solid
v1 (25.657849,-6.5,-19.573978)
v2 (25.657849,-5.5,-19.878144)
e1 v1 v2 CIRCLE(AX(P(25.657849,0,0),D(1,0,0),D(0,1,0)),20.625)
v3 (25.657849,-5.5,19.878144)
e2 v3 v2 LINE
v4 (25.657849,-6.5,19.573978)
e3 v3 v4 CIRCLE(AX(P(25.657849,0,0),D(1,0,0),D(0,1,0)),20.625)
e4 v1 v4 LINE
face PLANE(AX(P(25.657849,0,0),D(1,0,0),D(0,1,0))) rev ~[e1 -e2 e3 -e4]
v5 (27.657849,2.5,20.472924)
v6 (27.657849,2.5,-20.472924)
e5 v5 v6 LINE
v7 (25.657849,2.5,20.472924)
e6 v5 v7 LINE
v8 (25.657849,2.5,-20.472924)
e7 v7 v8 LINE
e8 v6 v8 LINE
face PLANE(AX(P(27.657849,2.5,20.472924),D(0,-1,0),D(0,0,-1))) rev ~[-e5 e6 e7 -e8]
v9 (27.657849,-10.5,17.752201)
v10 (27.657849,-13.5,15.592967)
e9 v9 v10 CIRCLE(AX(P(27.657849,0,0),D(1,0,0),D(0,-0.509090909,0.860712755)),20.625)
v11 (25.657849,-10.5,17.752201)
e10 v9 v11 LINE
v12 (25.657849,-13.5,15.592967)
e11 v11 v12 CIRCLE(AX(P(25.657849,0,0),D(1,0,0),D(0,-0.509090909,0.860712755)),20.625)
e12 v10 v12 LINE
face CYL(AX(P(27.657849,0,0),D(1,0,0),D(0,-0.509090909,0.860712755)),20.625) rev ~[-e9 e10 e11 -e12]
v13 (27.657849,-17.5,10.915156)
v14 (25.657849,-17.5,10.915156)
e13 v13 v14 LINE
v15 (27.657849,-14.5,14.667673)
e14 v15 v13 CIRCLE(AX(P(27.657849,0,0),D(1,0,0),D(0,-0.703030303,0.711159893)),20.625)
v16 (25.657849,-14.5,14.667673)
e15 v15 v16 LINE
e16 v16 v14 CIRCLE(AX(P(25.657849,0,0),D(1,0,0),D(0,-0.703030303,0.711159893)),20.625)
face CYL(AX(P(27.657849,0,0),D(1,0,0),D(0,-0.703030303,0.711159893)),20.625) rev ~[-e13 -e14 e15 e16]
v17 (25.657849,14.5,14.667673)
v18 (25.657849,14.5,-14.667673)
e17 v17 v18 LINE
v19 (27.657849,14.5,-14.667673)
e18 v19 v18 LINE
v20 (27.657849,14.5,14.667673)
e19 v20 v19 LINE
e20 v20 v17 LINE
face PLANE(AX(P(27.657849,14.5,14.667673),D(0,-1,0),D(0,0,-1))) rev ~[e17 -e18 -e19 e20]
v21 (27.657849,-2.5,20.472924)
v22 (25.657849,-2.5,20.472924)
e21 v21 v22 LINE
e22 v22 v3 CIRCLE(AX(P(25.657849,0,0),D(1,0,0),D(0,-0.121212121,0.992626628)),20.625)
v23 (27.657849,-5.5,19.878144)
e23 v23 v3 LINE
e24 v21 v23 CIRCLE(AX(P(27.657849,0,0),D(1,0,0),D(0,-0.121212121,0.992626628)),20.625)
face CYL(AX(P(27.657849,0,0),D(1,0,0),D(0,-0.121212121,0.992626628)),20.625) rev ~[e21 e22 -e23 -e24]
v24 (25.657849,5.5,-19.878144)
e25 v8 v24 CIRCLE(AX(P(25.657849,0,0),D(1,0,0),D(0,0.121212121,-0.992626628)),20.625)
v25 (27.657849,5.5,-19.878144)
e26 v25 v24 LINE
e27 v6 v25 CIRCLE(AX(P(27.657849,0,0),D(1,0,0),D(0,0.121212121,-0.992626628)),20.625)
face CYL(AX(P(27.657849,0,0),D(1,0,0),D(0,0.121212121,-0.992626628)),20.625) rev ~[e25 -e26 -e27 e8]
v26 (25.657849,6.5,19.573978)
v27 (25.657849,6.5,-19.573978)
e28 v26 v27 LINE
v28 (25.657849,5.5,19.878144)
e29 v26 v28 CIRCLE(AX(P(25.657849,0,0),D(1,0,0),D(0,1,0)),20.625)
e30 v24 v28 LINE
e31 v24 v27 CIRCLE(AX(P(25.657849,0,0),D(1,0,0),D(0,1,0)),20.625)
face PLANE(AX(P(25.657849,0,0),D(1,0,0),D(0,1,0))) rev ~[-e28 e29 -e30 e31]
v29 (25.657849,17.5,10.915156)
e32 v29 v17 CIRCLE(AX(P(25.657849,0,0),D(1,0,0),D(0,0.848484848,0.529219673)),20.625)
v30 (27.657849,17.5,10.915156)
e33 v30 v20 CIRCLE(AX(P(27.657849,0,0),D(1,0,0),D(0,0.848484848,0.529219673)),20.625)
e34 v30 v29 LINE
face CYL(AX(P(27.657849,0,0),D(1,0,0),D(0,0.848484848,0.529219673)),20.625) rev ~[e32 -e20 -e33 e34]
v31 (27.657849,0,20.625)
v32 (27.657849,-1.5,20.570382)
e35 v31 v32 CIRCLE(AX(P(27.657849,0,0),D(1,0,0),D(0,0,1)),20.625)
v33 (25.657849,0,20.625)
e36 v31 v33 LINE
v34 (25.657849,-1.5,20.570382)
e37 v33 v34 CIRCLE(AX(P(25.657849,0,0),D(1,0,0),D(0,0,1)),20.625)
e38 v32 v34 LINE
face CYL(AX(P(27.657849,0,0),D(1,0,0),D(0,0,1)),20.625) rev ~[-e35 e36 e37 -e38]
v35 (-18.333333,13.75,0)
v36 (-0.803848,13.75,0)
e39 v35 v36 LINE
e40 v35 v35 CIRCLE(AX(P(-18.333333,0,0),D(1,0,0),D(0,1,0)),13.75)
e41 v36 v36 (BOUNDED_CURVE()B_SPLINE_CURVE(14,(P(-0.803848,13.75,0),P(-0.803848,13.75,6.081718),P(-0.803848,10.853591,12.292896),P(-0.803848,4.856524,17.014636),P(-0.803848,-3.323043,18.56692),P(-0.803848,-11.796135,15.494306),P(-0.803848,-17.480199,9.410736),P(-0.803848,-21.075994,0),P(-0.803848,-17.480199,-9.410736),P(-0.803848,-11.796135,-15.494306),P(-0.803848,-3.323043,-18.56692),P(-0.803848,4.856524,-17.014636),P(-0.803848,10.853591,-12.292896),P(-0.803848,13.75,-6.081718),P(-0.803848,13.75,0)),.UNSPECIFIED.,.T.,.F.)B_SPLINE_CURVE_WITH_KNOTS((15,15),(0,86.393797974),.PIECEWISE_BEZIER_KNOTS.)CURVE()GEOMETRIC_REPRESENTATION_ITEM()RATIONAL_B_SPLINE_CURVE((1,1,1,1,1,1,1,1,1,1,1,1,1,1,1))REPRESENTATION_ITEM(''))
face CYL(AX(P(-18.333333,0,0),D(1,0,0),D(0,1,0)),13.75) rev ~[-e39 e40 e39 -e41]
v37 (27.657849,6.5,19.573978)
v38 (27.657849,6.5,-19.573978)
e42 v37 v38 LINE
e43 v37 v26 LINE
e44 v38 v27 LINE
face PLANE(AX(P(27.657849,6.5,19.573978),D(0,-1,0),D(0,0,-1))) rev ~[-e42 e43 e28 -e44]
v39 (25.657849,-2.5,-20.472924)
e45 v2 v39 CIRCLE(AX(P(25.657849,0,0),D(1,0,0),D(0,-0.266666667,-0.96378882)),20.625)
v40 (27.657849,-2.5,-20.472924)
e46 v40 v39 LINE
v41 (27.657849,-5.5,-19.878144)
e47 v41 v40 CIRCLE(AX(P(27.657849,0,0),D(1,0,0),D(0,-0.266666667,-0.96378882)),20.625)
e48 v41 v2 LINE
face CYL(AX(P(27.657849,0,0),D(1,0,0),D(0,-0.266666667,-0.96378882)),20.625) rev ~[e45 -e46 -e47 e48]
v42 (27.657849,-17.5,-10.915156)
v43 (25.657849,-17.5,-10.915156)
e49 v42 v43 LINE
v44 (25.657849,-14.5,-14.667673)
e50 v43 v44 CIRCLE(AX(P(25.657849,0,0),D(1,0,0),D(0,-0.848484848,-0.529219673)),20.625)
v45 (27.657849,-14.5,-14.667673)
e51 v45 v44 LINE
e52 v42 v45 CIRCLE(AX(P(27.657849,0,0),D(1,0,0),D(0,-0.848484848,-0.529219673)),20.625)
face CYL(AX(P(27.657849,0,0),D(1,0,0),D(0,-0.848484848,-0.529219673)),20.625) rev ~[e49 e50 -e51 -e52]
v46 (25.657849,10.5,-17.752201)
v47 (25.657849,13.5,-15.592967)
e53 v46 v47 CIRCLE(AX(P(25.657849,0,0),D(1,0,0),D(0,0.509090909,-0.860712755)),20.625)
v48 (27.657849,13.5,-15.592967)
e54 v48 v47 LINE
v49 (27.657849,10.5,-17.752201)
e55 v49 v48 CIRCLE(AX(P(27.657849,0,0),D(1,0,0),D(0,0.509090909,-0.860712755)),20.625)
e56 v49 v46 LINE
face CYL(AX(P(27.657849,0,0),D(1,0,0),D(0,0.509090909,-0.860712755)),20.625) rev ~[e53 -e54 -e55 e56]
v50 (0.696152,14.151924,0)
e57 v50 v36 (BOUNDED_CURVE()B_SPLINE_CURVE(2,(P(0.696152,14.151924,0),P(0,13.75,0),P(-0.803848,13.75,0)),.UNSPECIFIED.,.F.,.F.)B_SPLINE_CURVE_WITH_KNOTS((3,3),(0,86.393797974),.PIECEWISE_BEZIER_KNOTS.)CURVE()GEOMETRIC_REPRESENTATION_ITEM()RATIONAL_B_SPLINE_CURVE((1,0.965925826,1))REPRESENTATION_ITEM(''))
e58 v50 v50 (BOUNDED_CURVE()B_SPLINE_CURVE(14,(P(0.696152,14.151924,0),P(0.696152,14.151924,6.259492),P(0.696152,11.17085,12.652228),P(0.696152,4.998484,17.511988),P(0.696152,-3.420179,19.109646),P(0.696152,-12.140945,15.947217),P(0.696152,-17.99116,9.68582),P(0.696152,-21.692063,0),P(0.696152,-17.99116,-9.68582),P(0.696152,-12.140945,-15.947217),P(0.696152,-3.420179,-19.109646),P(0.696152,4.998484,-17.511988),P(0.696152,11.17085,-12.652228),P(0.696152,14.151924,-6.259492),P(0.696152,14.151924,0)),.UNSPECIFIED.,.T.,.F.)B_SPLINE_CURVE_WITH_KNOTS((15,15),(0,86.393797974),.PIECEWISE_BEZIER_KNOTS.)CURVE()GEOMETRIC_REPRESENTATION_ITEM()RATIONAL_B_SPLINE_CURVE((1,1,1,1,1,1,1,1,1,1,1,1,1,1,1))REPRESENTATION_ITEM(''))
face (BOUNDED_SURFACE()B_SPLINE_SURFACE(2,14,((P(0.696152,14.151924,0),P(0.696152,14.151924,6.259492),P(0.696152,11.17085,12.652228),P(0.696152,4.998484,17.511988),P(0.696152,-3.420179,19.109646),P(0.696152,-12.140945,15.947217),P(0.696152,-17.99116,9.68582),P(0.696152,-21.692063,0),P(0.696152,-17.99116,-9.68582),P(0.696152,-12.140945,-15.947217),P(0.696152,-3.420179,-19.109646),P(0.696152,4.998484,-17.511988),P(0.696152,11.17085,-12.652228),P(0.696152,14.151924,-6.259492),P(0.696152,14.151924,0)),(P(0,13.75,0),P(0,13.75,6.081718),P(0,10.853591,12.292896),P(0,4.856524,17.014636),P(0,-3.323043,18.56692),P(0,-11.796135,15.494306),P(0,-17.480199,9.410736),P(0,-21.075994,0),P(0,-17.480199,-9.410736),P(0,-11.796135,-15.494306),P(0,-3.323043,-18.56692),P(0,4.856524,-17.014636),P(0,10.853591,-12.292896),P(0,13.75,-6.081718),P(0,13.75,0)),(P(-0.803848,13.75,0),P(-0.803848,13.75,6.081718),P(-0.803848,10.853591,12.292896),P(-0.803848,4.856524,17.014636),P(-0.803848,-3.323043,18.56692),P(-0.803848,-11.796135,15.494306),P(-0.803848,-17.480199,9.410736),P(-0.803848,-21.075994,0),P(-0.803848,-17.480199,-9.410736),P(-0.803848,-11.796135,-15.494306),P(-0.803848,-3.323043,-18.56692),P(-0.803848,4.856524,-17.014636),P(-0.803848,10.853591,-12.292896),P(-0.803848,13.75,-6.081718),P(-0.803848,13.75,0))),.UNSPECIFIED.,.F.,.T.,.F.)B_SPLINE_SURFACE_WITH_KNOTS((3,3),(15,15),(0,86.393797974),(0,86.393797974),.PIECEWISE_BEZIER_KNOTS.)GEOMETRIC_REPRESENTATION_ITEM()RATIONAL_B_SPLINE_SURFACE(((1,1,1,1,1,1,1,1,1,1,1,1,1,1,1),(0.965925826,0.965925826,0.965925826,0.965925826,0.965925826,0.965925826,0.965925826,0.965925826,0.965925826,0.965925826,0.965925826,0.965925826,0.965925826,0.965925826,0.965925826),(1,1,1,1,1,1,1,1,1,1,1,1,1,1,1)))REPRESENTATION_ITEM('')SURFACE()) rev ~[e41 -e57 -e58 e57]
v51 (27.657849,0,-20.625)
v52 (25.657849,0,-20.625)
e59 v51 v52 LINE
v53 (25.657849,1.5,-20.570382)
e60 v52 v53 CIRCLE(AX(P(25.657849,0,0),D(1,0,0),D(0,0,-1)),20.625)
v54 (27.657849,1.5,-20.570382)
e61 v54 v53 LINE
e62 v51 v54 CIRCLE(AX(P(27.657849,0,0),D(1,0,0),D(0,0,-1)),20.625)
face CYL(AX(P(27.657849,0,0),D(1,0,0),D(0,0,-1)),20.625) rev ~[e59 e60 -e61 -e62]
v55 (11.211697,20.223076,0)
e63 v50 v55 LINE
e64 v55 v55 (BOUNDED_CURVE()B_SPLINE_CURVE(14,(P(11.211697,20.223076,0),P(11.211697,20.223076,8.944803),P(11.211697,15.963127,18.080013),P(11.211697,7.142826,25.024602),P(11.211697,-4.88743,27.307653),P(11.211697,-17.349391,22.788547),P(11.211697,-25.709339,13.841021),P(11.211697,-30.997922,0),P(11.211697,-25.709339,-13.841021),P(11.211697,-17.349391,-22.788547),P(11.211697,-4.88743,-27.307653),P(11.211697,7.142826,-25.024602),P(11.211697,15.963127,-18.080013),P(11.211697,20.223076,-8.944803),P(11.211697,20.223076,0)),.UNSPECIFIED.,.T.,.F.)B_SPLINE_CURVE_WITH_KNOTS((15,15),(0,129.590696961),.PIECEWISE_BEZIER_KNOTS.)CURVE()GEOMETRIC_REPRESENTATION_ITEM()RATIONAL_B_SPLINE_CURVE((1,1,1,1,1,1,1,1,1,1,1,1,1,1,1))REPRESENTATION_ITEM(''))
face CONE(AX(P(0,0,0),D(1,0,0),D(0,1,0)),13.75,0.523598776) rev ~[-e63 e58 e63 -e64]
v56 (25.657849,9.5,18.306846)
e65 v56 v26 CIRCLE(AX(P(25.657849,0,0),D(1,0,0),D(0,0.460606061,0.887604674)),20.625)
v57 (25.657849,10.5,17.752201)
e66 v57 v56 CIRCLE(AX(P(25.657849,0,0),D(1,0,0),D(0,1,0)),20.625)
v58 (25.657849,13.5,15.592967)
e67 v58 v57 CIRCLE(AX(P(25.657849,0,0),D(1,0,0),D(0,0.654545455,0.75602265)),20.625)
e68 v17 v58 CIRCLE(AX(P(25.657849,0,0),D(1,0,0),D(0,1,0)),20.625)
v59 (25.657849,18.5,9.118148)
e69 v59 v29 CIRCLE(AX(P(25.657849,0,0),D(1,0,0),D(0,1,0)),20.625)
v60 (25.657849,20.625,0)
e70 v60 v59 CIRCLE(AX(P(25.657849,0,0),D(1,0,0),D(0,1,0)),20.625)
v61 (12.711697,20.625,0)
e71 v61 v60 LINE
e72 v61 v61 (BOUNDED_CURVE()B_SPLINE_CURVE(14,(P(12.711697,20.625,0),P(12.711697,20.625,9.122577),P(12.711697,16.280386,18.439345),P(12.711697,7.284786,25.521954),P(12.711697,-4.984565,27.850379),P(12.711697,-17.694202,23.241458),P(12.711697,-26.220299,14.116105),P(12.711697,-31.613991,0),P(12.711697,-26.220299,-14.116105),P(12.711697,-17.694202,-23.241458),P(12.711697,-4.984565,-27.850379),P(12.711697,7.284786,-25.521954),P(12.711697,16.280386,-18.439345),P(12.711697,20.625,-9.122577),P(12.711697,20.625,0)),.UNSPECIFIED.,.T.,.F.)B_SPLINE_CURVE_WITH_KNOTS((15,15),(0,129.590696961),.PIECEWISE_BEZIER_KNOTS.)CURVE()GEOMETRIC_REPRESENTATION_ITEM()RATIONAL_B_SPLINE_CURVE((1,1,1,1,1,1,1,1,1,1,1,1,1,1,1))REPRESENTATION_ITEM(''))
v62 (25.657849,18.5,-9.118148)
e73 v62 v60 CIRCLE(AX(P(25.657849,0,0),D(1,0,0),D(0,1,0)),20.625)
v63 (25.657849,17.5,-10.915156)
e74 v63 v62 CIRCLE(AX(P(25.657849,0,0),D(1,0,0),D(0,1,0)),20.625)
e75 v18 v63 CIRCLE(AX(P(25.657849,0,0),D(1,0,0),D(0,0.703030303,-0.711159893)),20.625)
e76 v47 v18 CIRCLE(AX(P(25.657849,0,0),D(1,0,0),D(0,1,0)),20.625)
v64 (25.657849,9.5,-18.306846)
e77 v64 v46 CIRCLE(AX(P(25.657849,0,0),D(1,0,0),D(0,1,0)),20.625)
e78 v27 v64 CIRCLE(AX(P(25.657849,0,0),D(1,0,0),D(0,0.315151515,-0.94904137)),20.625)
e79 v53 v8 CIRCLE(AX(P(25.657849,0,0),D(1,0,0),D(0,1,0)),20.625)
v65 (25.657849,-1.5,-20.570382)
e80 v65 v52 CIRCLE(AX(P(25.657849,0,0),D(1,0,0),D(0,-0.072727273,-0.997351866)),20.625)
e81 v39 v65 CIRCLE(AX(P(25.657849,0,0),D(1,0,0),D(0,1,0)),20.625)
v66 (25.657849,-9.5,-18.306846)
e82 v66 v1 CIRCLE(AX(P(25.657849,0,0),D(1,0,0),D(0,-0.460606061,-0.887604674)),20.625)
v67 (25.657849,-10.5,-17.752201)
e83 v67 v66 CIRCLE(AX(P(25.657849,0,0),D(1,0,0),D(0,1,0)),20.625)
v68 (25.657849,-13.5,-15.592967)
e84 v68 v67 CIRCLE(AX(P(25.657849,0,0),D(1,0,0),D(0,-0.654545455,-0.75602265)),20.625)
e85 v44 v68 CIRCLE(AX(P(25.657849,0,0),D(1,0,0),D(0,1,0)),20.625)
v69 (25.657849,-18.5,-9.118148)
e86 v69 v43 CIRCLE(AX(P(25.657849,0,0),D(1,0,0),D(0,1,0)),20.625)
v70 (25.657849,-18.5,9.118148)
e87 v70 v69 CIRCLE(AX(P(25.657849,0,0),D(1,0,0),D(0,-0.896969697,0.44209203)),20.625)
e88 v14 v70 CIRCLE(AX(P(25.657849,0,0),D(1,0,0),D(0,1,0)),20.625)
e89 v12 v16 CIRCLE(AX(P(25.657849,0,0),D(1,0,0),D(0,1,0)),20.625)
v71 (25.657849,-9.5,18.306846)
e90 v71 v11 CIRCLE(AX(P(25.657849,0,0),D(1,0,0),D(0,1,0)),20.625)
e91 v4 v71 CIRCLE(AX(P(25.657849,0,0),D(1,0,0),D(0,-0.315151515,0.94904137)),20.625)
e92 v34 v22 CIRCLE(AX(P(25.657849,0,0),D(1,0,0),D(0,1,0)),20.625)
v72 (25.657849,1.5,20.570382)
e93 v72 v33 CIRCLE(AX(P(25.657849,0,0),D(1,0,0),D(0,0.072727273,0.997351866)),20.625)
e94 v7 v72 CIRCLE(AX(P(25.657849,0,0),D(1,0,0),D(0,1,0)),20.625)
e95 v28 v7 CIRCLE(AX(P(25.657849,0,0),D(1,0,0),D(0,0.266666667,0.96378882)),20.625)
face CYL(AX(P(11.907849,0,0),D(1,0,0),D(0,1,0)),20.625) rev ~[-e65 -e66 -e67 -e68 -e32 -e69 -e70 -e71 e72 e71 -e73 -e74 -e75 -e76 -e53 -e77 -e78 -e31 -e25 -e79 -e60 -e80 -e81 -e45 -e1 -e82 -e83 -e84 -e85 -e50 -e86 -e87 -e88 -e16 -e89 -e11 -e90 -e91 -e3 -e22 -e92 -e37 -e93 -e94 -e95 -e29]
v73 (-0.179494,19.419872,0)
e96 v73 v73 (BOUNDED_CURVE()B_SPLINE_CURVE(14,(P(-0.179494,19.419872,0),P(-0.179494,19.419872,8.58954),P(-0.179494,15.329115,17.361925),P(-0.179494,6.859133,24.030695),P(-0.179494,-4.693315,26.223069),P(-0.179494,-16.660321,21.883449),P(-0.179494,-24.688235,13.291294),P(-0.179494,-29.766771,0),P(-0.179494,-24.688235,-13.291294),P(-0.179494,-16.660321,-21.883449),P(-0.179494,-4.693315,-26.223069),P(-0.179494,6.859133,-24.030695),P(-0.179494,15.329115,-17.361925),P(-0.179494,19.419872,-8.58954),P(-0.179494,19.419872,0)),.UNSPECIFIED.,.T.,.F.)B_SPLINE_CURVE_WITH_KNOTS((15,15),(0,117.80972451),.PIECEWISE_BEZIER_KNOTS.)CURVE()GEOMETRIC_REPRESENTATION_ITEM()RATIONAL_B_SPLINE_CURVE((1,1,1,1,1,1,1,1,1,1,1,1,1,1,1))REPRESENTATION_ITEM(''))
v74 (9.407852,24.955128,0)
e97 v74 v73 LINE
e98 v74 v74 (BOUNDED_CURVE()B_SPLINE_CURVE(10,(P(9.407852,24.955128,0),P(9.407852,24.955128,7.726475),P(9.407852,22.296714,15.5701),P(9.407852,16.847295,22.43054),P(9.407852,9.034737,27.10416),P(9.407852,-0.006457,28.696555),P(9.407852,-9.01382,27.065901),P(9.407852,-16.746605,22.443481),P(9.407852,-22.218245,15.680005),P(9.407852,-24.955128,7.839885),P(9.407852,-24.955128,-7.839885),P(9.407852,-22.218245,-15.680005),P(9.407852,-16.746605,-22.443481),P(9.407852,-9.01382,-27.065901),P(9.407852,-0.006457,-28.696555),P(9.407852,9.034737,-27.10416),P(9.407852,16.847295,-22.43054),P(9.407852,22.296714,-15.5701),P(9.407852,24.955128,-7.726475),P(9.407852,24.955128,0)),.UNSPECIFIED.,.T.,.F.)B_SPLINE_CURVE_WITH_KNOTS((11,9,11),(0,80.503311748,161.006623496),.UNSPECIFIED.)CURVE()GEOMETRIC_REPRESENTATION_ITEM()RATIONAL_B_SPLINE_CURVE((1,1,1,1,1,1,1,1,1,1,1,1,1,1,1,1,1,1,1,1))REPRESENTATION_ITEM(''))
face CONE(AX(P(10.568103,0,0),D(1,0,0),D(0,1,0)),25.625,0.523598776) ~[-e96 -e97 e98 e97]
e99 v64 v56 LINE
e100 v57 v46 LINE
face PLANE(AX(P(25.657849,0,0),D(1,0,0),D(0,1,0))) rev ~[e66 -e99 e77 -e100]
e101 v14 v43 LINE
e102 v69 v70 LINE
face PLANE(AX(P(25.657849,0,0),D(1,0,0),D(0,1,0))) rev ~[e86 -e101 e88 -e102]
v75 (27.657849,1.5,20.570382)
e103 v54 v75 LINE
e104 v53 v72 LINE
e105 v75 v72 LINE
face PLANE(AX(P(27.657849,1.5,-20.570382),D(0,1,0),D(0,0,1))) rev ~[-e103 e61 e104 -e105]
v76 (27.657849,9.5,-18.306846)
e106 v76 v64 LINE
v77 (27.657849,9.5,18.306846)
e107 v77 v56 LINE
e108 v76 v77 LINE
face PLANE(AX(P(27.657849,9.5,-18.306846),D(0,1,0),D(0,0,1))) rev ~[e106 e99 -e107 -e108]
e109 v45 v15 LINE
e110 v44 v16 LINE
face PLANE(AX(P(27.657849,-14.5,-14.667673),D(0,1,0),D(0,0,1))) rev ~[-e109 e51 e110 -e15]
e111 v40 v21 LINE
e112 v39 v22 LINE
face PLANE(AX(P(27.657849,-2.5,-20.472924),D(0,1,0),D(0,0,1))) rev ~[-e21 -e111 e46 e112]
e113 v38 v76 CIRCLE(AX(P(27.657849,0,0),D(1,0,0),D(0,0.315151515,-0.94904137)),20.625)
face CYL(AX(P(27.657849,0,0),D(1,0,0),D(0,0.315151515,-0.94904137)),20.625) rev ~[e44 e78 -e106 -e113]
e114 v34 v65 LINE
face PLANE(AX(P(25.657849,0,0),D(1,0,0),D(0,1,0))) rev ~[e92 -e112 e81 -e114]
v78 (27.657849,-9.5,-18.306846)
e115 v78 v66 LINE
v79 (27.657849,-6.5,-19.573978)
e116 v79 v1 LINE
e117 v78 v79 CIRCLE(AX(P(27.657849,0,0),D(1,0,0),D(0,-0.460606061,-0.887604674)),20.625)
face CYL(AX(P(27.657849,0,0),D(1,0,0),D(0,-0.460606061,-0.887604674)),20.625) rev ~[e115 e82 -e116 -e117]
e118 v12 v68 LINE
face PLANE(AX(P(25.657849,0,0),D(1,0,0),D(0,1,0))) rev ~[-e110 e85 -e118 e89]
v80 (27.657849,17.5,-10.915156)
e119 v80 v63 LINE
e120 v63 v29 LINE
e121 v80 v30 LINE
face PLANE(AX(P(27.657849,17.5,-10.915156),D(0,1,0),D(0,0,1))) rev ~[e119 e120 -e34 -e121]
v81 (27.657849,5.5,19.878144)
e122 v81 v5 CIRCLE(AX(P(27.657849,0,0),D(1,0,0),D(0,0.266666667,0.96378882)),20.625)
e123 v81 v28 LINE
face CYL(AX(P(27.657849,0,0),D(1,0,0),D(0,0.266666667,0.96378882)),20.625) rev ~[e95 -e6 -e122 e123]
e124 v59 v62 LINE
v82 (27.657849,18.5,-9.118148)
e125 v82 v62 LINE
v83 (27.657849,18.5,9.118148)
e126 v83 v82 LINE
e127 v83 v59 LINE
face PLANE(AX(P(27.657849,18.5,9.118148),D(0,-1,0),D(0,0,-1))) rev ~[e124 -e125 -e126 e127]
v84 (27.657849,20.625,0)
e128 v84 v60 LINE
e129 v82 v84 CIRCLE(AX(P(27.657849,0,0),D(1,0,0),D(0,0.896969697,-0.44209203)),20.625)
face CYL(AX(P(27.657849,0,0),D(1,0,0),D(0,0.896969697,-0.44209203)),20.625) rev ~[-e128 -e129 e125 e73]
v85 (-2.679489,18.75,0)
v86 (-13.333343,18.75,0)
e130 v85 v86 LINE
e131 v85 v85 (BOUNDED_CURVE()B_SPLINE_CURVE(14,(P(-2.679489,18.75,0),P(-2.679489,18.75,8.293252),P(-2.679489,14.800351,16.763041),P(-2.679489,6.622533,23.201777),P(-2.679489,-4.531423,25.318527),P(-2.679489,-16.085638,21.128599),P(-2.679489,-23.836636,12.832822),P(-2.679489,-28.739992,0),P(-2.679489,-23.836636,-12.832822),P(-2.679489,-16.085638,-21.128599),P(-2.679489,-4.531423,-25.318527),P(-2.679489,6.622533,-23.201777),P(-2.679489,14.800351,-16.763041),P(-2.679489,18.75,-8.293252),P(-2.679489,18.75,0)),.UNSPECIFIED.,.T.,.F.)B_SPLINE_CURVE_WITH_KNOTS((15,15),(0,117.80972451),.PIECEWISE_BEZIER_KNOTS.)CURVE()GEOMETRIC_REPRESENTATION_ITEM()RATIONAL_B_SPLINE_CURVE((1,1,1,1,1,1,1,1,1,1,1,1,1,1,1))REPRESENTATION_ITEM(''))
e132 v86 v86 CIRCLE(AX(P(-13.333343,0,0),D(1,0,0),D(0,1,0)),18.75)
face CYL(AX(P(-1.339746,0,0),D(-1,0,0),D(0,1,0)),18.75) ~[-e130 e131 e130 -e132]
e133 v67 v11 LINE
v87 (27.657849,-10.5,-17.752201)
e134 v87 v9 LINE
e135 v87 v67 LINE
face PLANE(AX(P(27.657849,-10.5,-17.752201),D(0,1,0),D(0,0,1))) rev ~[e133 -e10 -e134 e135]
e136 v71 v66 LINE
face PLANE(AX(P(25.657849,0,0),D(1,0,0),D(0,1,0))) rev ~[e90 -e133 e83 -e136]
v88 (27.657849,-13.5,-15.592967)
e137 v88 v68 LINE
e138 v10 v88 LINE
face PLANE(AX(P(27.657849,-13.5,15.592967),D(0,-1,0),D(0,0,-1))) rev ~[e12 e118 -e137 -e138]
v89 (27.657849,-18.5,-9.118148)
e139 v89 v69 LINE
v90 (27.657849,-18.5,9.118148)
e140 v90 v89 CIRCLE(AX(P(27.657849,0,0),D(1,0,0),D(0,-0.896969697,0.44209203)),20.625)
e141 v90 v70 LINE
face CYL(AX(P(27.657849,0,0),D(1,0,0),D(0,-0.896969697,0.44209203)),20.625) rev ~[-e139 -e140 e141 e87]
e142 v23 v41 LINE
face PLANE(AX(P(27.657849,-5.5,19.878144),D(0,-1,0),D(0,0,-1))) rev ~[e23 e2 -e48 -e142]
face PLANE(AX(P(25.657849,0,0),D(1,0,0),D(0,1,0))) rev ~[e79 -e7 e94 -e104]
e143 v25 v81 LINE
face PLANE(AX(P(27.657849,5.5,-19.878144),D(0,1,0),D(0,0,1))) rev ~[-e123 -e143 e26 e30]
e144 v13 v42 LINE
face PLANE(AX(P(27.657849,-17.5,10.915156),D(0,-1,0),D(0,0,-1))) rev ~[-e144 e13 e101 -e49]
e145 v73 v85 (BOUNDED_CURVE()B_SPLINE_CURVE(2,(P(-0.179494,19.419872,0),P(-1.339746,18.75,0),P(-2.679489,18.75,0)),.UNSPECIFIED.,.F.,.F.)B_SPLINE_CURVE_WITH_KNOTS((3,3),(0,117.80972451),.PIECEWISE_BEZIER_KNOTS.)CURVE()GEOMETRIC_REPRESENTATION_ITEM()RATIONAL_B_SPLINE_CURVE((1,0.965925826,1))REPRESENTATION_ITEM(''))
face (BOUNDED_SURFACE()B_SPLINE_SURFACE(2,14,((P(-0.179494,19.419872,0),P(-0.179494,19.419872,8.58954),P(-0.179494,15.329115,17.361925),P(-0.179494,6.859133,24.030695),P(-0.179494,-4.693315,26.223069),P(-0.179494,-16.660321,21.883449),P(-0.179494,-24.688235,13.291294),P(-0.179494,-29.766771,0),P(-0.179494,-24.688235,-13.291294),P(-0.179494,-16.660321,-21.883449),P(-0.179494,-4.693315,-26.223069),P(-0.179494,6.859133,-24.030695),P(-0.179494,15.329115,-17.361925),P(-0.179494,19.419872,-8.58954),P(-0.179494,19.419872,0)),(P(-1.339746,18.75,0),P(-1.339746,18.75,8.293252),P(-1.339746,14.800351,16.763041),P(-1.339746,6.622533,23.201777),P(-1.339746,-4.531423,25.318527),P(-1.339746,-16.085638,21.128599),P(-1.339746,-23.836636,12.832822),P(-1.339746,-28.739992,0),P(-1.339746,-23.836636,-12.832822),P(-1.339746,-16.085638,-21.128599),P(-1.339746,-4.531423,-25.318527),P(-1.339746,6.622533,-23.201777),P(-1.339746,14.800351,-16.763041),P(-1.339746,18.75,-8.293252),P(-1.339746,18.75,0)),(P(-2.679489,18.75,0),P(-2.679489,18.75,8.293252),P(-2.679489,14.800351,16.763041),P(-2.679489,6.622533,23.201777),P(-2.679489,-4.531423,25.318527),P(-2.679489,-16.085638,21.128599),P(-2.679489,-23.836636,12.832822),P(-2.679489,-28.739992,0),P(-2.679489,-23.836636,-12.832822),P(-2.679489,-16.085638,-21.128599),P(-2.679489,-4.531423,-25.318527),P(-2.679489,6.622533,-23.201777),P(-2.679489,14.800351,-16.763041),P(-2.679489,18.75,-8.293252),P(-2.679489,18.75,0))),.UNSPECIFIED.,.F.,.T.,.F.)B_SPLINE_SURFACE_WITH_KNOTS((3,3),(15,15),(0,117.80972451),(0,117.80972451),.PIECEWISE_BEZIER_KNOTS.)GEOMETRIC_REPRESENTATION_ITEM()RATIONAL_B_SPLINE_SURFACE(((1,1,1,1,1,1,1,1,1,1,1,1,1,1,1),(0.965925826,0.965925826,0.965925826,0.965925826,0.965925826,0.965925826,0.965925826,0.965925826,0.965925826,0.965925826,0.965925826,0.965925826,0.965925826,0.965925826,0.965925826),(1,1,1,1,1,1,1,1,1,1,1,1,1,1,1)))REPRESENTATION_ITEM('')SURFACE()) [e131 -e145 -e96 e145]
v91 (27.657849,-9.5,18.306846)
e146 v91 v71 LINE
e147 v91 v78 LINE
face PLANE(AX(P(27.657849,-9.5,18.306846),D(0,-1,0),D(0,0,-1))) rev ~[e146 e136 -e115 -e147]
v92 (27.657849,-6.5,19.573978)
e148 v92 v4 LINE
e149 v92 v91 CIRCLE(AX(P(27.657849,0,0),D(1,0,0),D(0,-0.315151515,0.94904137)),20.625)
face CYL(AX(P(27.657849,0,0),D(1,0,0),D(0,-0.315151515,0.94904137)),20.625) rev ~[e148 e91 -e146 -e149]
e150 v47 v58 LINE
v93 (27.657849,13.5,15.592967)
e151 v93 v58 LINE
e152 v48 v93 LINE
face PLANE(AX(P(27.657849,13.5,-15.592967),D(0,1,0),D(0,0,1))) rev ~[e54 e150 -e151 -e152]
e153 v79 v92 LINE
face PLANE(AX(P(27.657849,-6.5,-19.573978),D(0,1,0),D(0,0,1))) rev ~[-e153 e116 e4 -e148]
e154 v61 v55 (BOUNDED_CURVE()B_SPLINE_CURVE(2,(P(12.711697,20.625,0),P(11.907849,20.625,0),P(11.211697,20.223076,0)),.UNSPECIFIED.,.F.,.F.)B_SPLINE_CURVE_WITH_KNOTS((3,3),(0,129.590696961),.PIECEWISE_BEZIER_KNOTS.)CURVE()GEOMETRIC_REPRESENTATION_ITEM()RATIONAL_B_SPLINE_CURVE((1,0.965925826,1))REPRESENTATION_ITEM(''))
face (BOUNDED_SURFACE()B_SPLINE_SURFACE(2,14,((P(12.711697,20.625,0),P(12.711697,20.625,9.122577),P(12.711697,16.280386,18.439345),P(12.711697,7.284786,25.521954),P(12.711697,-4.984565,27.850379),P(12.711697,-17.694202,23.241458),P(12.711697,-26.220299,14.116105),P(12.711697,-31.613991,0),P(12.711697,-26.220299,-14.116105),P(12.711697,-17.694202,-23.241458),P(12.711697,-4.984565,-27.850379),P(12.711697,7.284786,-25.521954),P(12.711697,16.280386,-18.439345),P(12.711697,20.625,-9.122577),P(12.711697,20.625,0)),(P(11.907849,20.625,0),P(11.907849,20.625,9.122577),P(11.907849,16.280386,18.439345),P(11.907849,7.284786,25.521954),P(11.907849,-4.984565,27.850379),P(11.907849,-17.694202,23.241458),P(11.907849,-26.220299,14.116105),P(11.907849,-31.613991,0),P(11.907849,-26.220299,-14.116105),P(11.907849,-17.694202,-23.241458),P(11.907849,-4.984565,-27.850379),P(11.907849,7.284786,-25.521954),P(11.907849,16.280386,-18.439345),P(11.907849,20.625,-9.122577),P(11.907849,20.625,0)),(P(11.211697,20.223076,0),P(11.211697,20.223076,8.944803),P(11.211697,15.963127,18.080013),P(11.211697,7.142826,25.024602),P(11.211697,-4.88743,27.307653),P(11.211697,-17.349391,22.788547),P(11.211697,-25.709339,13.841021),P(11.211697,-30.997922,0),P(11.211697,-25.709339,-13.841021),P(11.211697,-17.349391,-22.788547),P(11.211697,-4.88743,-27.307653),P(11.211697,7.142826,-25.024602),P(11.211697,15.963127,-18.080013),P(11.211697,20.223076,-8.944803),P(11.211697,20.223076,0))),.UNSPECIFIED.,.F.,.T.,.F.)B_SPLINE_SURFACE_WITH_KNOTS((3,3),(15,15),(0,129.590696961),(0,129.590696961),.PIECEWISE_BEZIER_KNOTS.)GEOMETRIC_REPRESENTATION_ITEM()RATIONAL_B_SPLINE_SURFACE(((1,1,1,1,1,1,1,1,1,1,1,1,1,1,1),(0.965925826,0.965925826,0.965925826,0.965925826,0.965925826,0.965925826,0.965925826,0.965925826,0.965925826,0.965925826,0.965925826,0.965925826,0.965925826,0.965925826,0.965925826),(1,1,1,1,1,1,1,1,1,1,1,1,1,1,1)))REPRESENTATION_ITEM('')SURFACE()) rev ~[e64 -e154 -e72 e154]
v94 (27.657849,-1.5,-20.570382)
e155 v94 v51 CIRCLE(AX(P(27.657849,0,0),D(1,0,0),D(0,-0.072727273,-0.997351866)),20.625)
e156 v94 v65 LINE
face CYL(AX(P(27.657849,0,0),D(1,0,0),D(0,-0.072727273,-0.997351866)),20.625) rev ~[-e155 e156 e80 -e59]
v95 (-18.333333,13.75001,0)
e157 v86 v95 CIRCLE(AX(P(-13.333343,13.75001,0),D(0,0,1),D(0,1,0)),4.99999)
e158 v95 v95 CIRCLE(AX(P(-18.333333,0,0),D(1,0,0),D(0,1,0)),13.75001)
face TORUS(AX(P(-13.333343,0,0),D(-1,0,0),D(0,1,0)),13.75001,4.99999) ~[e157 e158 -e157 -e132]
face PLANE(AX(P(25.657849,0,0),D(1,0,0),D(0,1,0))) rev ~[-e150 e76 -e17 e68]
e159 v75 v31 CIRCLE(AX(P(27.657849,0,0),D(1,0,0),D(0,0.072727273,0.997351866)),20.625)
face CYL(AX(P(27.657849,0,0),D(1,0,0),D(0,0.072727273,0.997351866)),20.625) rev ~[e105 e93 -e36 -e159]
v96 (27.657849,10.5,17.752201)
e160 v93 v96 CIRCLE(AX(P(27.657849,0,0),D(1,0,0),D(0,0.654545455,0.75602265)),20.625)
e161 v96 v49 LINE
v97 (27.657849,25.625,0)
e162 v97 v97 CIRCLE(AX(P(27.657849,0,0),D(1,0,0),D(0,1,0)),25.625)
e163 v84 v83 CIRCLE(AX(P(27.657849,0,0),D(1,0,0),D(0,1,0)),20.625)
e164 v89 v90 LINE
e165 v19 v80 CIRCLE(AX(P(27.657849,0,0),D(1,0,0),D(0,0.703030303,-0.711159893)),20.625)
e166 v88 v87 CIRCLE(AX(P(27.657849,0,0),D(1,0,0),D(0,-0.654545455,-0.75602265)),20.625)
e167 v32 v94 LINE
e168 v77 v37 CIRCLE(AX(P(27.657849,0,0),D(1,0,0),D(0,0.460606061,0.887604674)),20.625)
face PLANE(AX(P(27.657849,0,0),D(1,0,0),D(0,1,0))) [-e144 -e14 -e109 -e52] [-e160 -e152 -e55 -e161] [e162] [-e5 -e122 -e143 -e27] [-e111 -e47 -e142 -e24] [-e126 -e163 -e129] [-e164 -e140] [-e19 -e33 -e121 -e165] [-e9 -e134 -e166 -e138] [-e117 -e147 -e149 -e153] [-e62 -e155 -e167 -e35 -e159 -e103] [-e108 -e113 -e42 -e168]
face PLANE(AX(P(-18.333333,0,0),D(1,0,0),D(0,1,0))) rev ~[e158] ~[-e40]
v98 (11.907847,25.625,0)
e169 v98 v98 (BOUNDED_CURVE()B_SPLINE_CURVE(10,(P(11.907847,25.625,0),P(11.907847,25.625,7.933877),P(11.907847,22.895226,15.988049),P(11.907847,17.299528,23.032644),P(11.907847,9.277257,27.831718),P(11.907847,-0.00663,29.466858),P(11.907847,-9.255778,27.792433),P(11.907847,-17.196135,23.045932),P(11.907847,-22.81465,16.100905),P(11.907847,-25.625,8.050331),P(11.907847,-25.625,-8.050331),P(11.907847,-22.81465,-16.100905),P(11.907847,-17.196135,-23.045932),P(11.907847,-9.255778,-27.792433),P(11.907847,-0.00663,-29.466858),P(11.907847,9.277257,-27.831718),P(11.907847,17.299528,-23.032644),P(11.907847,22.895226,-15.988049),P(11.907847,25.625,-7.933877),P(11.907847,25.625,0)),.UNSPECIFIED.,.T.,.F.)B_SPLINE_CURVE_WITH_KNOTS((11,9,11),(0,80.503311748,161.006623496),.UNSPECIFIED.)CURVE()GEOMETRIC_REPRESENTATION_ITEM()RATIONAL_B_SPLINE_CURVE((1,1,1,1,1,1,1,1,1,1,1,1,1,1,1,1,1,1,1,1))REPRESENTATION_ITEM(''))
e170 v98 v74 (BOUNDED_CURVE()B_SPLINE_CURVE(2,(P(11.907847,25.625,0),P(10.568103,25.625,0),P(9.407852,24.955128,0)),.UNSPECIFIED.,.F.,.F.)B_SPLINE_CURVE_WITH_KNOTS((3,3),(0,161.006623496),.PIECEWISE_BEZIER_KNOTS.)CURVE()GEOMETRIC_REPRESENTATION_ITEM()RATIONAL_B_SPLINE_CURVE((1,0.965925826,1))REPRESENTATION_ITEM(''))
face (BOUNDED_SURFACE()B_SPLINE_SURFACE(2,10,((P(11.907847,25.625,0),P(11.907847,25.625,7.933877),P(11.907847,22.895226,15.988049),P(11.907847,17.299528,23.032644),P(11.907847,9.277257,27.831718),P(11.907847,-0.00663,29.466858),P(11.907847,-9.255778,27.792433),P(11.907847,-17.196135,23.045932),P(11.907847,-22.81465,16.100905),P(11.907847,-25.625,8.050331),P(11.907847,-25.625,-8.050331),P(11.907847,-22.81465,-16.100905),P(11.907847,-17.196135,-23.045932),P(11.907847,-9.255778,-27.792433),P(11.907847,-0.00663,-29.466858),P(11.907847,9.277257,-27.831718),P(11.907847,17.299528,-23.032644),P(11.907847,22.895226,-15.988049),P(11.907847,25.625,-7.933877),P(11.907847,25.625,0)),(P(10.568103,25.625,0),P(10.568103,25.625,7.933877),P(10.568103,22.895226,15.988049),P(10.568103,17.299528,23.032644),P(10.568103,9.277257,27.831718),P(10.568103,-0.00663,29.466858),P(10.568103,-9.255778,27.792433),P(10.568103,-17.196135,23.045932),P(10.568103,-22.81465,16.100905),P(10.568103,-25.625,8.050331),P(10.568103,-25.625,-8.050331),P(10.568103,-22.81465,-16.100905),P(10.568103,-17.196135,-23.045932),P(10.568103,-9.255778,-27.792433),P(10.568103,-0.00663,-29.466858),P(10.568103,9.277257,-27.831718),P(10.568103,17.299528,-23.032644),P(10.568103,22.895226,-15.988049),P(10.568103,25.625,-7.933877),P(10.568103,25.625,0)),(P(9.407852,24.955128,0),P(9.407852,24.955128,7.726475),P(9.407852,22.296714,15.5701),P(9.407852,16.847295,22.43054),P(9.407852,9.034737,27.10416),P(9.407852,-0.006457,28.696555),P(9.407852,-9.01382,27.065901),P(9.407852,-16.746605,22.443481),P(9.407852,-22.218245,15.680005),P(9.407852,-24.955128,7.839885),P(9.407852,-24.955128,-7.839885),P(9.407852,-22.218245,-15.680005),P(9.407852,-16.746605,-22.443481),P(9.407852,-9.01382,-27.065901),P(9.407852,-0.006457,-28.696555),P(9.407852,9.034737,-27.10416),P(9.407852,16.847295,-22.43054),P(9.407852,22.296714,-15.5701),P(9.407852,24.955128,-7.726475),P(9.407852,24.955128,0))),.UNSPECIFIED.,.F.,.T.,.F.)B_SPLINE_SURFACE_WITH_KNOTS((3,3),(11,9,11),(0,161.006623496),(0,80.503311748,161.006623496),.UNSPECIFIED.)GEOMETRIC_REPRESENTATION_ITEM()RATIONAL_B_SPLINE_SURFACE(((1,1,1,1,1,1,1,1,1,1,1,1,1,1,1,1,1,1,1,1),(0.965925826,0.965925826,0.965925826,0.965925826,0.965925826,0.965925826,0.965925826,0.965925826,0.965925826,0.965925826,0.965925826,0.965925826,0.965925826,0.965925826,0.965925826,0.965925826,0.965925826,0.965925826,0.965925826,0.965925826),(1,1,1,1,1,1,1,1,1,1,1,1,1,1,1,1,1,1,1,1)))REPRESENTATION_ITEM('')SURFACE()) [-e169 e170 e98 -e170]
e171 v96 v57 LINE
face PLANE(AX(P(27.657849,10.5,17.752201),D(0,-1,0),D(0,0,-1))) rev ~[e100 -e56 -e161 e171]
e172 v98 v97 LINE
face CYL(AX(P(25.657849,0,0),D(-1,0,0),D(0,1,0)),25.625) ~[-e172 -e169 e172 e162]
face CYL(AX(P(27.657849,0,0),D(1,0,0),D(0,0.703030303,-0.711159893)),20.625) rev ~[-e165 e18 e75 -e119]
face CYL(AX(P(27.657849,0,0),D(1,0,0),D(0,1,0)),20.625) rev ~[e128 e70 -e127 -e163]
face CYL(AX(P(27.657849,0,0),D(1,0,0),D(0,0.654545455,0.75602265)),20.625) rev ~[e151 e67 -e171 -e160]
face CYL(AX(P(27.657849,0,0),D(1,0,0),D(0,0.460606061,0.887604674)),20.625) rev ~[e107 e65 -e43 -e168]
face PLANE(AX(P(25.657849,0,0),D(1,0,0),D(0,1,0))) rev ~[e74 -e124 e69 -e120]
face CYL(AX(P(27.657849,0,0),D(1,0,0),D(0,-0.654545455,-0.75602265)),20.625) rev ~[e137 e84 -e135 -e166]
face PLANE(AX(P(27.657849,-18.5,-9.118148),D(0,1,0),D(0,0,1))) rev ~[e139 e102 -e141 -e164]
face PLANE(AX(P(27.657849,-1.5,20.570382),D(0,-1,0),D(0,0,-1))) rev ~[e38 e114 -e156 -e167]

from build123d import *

# Parameters (mm, degrees)
F2_R     = 25.625
F3_DEPTH = 2
F5_DEPTH = 2
F6_R     = 4.99999
F7_R     = 3


# Not quite as in the source:
# - a fillet or chamfer is up to 0.001 mm smaller than in the source, because OpenCascade refuses the exact size


with BuildPart() as f1:
    # F0 (on Top) → F1 (revolve)
    with BuildSketch(Plane.XY):
        Polygon((-18.3333333333, 18.75), (-18.3333333333, 13.75), (0, 13.75), (11.907849302, 20.625), (25.657849302, 20.625), (25.657849302, 25.625), (10.5681033399, 25.625), (-1.3397459622, 18.75), align=None)
    revolve(axis=Axis((-8.7595172226, 0, 0), (1, 0, 0)))

    # F2 (on face) → F3 (join)
    with BuildSketch(Plane.YZ.offset(25.657849302)):
        Circle(F2_R)
    extrude(amount=F3_DEPTH)

    # F4 (on face) → F5 (cut, through all)
    with BuildSketch(Plane.YZ.offset(27.657849302)):
        with BuildLine():
            ThreePointArc((20.625, 0), (20.0867260274, 4.6812458278), (18.5, 9.1181481124))
            Line((18.5, 9.1181481124), (18.5, -9.1181481124))
            ThreePointArc((18.5, -9.1181481124), (20.0867260274, -4.6812458278), (20.625, 0))
        make_face()
        with BuildLine():
            ThreePointArc((17.5, 10.9151557479), (16.1096351924, 12.8790635905), (14.5, 14.6676727875))
            Line((14.5, 14.6676727875), (14.5, -14.6676727875))
            ThreePointArc((14.5, -14.6676727875), (16.1096351924, -12.8790635905), (17.5, -10.9151557479))
            Line((17.5, -10.9151557479), (17.5, 10.9151557479))
        make_face()
        with BuildLine():
            ThreePointArc((13.5, 15.5929671647), (12.0484676296, 16.7399239179), (10.5, 17.7522005678))
            Line((10.5, 17.7522005678), (10.5, -17.7522005678))
            ThreePointArc((10.5, -17.7522005678), (12.0484676296, -16.7399239179), (13.5, -15.5929671647))
            Line((13.5, -15.5929671647), (13.5, 15.5929671647))
        make_face()
        with BuildLine():
            ThreePointArc((9.5, 18.3068463969), (8.0250486473, 18.9997162929), (6.5, 19.573978262))
            Line((6.5, 19.573978262), (6.5, -19.573978262))
            ThreePointArc((6.5, -19.573978262), (8.0250486473, -18.9997162929), (9.5, -18.3068463969))
            Line((9.5, -18.3068463969), (9.5, 18.3068463969))
        make_face()
        with BuildLine():
            ThreePointArc((5.5, 19.8781444054), (4.0110398588, 20.2312180615), (2.5, 20.4729241927))
            Line((2.5, 20.4729241927), (2.5, -20.4729241927))
            ThreePointArc((2.5, -20.4729241927), (4.0110398588, -20.2312180615), (5.5, -19.8781444054))
            Line((5.5, -19.8781444054), (5.5, 19.8781444054))
        make_face()
        with BuildLine():
            ThreePointArc((1.5, 20.5703822279), (0.7504970188, 20.6113410341), (0, 20.625))
            ThreePointArc((0, 20.625), (-0.7504970188, 20.6113410341), (-1.5, 20.5703822279))
            Line((-1.5, 20.5703822279), (-1.5, -20.5703822279))
            ThreePointArc((-1.5, -20.5703822279), (-0.7504970188, -20.6113410341), (0, -20.625))
            ThreePointArc((0, -20.625), (0.7504970188, -20.6113410341), (1.5, -20.5703822279))
            Line((1.5, -20.5703822279), (1.5, 20.5703822279))
        make_face()
        with BuildLine():
            Line((-2.5, -20.4729241927), (-2.5, 20.4729241927))
            ThreePointArc((-2.5, 20.4729241927), (-4.0110398588, 20.2312180615), (-5.5, 19.8781444054))
            Line((-5.5, 19.8781444054), (-5.5, -19.8781444054))
            ThreePointArc((-5.5, -19.8781444054), (-4.0110398588, -20.2312180615), (-2.5, -20.4729241927))
        make_face()
        with BuildLine():
            Line((-6.5, -19.573978262), (-6.5, 19.573978262))
            ThreePointArc((-6.5, 19.573978262), (-8.0250486473, 18.9997162929), (-9.5, 18.3068463969))
            Line((-9.5, 18.3068463969), (-9.5, -18.3068463969))
            ThreePointArc((-9.5, -18.3068463969), (-8.0250486473, -18.9997162929), (-6.5, -19.573978262))
        make_face()
        with BuildLine():
            Line((-10.5, -17.7522005678), (-10.5, 17.7522005678))
            ThreePointArc((-10.5, 17.7522005678), (-12.0484676296, 16.7399239179), (-13.5, 15.5929671647))
            Line((-13.5, 15.5929671647), (-13.5, -15.5929671647))
            ThreePointArc((-13.5, -15.5929671647), (-12.0484676296, -16.7399239179), (-10.5, -17.7522005678))
        make_face()
        with BuildLine():
            Line((-14.5, -14.6676727875), (-14.5, 14.6676727875))
            ThreePointArc((-14.5, 14.6676727875), (-16.1096351924, 12.8790635905), (-17.5, 10.9151557479))
            Line((-17.5, 10.9151557479), (-17.5, -10.9151557479))
            ThreePointArc((-17.5, -10.9151557479), (-16.1096351924, -12.8790635905), (-14.5, -14.6676727875))
        make_face()
        with BuildLine():
            Line((-18.5, -9.1181481124), (-18.5, 9.1181481124))
            ThreePointArc((-18.5, 9.1181481124), (-20.625, 0), (-18.5, -9.1181481124))
        make_face()
    extrude(amount=-F5_DEPTH, mode=Mode.SUBTRACT)

    # F6 (radius 5 in the source; OpenCascade refuses exactly that, so slightly less here)
    f6_edges = [f1.edges().sort_by_distance(p)[0] for p in [
        (-18.333333, -18.75, 0),
        (-1.339746, -18.75, 0),
        (10.568103, -25.625, 0),
    ]]
    fillet(f6_edges, radius=F6_R)

    # F7
    f7_edges = [f1.edges().sort_by_distance(p)[0] for p in [
        (11.907849, -20.625, 0),
        (0, -13.75, 0),
    ]]
    fillet(f7_edges, radius=F7_R)


solid = f1.part
